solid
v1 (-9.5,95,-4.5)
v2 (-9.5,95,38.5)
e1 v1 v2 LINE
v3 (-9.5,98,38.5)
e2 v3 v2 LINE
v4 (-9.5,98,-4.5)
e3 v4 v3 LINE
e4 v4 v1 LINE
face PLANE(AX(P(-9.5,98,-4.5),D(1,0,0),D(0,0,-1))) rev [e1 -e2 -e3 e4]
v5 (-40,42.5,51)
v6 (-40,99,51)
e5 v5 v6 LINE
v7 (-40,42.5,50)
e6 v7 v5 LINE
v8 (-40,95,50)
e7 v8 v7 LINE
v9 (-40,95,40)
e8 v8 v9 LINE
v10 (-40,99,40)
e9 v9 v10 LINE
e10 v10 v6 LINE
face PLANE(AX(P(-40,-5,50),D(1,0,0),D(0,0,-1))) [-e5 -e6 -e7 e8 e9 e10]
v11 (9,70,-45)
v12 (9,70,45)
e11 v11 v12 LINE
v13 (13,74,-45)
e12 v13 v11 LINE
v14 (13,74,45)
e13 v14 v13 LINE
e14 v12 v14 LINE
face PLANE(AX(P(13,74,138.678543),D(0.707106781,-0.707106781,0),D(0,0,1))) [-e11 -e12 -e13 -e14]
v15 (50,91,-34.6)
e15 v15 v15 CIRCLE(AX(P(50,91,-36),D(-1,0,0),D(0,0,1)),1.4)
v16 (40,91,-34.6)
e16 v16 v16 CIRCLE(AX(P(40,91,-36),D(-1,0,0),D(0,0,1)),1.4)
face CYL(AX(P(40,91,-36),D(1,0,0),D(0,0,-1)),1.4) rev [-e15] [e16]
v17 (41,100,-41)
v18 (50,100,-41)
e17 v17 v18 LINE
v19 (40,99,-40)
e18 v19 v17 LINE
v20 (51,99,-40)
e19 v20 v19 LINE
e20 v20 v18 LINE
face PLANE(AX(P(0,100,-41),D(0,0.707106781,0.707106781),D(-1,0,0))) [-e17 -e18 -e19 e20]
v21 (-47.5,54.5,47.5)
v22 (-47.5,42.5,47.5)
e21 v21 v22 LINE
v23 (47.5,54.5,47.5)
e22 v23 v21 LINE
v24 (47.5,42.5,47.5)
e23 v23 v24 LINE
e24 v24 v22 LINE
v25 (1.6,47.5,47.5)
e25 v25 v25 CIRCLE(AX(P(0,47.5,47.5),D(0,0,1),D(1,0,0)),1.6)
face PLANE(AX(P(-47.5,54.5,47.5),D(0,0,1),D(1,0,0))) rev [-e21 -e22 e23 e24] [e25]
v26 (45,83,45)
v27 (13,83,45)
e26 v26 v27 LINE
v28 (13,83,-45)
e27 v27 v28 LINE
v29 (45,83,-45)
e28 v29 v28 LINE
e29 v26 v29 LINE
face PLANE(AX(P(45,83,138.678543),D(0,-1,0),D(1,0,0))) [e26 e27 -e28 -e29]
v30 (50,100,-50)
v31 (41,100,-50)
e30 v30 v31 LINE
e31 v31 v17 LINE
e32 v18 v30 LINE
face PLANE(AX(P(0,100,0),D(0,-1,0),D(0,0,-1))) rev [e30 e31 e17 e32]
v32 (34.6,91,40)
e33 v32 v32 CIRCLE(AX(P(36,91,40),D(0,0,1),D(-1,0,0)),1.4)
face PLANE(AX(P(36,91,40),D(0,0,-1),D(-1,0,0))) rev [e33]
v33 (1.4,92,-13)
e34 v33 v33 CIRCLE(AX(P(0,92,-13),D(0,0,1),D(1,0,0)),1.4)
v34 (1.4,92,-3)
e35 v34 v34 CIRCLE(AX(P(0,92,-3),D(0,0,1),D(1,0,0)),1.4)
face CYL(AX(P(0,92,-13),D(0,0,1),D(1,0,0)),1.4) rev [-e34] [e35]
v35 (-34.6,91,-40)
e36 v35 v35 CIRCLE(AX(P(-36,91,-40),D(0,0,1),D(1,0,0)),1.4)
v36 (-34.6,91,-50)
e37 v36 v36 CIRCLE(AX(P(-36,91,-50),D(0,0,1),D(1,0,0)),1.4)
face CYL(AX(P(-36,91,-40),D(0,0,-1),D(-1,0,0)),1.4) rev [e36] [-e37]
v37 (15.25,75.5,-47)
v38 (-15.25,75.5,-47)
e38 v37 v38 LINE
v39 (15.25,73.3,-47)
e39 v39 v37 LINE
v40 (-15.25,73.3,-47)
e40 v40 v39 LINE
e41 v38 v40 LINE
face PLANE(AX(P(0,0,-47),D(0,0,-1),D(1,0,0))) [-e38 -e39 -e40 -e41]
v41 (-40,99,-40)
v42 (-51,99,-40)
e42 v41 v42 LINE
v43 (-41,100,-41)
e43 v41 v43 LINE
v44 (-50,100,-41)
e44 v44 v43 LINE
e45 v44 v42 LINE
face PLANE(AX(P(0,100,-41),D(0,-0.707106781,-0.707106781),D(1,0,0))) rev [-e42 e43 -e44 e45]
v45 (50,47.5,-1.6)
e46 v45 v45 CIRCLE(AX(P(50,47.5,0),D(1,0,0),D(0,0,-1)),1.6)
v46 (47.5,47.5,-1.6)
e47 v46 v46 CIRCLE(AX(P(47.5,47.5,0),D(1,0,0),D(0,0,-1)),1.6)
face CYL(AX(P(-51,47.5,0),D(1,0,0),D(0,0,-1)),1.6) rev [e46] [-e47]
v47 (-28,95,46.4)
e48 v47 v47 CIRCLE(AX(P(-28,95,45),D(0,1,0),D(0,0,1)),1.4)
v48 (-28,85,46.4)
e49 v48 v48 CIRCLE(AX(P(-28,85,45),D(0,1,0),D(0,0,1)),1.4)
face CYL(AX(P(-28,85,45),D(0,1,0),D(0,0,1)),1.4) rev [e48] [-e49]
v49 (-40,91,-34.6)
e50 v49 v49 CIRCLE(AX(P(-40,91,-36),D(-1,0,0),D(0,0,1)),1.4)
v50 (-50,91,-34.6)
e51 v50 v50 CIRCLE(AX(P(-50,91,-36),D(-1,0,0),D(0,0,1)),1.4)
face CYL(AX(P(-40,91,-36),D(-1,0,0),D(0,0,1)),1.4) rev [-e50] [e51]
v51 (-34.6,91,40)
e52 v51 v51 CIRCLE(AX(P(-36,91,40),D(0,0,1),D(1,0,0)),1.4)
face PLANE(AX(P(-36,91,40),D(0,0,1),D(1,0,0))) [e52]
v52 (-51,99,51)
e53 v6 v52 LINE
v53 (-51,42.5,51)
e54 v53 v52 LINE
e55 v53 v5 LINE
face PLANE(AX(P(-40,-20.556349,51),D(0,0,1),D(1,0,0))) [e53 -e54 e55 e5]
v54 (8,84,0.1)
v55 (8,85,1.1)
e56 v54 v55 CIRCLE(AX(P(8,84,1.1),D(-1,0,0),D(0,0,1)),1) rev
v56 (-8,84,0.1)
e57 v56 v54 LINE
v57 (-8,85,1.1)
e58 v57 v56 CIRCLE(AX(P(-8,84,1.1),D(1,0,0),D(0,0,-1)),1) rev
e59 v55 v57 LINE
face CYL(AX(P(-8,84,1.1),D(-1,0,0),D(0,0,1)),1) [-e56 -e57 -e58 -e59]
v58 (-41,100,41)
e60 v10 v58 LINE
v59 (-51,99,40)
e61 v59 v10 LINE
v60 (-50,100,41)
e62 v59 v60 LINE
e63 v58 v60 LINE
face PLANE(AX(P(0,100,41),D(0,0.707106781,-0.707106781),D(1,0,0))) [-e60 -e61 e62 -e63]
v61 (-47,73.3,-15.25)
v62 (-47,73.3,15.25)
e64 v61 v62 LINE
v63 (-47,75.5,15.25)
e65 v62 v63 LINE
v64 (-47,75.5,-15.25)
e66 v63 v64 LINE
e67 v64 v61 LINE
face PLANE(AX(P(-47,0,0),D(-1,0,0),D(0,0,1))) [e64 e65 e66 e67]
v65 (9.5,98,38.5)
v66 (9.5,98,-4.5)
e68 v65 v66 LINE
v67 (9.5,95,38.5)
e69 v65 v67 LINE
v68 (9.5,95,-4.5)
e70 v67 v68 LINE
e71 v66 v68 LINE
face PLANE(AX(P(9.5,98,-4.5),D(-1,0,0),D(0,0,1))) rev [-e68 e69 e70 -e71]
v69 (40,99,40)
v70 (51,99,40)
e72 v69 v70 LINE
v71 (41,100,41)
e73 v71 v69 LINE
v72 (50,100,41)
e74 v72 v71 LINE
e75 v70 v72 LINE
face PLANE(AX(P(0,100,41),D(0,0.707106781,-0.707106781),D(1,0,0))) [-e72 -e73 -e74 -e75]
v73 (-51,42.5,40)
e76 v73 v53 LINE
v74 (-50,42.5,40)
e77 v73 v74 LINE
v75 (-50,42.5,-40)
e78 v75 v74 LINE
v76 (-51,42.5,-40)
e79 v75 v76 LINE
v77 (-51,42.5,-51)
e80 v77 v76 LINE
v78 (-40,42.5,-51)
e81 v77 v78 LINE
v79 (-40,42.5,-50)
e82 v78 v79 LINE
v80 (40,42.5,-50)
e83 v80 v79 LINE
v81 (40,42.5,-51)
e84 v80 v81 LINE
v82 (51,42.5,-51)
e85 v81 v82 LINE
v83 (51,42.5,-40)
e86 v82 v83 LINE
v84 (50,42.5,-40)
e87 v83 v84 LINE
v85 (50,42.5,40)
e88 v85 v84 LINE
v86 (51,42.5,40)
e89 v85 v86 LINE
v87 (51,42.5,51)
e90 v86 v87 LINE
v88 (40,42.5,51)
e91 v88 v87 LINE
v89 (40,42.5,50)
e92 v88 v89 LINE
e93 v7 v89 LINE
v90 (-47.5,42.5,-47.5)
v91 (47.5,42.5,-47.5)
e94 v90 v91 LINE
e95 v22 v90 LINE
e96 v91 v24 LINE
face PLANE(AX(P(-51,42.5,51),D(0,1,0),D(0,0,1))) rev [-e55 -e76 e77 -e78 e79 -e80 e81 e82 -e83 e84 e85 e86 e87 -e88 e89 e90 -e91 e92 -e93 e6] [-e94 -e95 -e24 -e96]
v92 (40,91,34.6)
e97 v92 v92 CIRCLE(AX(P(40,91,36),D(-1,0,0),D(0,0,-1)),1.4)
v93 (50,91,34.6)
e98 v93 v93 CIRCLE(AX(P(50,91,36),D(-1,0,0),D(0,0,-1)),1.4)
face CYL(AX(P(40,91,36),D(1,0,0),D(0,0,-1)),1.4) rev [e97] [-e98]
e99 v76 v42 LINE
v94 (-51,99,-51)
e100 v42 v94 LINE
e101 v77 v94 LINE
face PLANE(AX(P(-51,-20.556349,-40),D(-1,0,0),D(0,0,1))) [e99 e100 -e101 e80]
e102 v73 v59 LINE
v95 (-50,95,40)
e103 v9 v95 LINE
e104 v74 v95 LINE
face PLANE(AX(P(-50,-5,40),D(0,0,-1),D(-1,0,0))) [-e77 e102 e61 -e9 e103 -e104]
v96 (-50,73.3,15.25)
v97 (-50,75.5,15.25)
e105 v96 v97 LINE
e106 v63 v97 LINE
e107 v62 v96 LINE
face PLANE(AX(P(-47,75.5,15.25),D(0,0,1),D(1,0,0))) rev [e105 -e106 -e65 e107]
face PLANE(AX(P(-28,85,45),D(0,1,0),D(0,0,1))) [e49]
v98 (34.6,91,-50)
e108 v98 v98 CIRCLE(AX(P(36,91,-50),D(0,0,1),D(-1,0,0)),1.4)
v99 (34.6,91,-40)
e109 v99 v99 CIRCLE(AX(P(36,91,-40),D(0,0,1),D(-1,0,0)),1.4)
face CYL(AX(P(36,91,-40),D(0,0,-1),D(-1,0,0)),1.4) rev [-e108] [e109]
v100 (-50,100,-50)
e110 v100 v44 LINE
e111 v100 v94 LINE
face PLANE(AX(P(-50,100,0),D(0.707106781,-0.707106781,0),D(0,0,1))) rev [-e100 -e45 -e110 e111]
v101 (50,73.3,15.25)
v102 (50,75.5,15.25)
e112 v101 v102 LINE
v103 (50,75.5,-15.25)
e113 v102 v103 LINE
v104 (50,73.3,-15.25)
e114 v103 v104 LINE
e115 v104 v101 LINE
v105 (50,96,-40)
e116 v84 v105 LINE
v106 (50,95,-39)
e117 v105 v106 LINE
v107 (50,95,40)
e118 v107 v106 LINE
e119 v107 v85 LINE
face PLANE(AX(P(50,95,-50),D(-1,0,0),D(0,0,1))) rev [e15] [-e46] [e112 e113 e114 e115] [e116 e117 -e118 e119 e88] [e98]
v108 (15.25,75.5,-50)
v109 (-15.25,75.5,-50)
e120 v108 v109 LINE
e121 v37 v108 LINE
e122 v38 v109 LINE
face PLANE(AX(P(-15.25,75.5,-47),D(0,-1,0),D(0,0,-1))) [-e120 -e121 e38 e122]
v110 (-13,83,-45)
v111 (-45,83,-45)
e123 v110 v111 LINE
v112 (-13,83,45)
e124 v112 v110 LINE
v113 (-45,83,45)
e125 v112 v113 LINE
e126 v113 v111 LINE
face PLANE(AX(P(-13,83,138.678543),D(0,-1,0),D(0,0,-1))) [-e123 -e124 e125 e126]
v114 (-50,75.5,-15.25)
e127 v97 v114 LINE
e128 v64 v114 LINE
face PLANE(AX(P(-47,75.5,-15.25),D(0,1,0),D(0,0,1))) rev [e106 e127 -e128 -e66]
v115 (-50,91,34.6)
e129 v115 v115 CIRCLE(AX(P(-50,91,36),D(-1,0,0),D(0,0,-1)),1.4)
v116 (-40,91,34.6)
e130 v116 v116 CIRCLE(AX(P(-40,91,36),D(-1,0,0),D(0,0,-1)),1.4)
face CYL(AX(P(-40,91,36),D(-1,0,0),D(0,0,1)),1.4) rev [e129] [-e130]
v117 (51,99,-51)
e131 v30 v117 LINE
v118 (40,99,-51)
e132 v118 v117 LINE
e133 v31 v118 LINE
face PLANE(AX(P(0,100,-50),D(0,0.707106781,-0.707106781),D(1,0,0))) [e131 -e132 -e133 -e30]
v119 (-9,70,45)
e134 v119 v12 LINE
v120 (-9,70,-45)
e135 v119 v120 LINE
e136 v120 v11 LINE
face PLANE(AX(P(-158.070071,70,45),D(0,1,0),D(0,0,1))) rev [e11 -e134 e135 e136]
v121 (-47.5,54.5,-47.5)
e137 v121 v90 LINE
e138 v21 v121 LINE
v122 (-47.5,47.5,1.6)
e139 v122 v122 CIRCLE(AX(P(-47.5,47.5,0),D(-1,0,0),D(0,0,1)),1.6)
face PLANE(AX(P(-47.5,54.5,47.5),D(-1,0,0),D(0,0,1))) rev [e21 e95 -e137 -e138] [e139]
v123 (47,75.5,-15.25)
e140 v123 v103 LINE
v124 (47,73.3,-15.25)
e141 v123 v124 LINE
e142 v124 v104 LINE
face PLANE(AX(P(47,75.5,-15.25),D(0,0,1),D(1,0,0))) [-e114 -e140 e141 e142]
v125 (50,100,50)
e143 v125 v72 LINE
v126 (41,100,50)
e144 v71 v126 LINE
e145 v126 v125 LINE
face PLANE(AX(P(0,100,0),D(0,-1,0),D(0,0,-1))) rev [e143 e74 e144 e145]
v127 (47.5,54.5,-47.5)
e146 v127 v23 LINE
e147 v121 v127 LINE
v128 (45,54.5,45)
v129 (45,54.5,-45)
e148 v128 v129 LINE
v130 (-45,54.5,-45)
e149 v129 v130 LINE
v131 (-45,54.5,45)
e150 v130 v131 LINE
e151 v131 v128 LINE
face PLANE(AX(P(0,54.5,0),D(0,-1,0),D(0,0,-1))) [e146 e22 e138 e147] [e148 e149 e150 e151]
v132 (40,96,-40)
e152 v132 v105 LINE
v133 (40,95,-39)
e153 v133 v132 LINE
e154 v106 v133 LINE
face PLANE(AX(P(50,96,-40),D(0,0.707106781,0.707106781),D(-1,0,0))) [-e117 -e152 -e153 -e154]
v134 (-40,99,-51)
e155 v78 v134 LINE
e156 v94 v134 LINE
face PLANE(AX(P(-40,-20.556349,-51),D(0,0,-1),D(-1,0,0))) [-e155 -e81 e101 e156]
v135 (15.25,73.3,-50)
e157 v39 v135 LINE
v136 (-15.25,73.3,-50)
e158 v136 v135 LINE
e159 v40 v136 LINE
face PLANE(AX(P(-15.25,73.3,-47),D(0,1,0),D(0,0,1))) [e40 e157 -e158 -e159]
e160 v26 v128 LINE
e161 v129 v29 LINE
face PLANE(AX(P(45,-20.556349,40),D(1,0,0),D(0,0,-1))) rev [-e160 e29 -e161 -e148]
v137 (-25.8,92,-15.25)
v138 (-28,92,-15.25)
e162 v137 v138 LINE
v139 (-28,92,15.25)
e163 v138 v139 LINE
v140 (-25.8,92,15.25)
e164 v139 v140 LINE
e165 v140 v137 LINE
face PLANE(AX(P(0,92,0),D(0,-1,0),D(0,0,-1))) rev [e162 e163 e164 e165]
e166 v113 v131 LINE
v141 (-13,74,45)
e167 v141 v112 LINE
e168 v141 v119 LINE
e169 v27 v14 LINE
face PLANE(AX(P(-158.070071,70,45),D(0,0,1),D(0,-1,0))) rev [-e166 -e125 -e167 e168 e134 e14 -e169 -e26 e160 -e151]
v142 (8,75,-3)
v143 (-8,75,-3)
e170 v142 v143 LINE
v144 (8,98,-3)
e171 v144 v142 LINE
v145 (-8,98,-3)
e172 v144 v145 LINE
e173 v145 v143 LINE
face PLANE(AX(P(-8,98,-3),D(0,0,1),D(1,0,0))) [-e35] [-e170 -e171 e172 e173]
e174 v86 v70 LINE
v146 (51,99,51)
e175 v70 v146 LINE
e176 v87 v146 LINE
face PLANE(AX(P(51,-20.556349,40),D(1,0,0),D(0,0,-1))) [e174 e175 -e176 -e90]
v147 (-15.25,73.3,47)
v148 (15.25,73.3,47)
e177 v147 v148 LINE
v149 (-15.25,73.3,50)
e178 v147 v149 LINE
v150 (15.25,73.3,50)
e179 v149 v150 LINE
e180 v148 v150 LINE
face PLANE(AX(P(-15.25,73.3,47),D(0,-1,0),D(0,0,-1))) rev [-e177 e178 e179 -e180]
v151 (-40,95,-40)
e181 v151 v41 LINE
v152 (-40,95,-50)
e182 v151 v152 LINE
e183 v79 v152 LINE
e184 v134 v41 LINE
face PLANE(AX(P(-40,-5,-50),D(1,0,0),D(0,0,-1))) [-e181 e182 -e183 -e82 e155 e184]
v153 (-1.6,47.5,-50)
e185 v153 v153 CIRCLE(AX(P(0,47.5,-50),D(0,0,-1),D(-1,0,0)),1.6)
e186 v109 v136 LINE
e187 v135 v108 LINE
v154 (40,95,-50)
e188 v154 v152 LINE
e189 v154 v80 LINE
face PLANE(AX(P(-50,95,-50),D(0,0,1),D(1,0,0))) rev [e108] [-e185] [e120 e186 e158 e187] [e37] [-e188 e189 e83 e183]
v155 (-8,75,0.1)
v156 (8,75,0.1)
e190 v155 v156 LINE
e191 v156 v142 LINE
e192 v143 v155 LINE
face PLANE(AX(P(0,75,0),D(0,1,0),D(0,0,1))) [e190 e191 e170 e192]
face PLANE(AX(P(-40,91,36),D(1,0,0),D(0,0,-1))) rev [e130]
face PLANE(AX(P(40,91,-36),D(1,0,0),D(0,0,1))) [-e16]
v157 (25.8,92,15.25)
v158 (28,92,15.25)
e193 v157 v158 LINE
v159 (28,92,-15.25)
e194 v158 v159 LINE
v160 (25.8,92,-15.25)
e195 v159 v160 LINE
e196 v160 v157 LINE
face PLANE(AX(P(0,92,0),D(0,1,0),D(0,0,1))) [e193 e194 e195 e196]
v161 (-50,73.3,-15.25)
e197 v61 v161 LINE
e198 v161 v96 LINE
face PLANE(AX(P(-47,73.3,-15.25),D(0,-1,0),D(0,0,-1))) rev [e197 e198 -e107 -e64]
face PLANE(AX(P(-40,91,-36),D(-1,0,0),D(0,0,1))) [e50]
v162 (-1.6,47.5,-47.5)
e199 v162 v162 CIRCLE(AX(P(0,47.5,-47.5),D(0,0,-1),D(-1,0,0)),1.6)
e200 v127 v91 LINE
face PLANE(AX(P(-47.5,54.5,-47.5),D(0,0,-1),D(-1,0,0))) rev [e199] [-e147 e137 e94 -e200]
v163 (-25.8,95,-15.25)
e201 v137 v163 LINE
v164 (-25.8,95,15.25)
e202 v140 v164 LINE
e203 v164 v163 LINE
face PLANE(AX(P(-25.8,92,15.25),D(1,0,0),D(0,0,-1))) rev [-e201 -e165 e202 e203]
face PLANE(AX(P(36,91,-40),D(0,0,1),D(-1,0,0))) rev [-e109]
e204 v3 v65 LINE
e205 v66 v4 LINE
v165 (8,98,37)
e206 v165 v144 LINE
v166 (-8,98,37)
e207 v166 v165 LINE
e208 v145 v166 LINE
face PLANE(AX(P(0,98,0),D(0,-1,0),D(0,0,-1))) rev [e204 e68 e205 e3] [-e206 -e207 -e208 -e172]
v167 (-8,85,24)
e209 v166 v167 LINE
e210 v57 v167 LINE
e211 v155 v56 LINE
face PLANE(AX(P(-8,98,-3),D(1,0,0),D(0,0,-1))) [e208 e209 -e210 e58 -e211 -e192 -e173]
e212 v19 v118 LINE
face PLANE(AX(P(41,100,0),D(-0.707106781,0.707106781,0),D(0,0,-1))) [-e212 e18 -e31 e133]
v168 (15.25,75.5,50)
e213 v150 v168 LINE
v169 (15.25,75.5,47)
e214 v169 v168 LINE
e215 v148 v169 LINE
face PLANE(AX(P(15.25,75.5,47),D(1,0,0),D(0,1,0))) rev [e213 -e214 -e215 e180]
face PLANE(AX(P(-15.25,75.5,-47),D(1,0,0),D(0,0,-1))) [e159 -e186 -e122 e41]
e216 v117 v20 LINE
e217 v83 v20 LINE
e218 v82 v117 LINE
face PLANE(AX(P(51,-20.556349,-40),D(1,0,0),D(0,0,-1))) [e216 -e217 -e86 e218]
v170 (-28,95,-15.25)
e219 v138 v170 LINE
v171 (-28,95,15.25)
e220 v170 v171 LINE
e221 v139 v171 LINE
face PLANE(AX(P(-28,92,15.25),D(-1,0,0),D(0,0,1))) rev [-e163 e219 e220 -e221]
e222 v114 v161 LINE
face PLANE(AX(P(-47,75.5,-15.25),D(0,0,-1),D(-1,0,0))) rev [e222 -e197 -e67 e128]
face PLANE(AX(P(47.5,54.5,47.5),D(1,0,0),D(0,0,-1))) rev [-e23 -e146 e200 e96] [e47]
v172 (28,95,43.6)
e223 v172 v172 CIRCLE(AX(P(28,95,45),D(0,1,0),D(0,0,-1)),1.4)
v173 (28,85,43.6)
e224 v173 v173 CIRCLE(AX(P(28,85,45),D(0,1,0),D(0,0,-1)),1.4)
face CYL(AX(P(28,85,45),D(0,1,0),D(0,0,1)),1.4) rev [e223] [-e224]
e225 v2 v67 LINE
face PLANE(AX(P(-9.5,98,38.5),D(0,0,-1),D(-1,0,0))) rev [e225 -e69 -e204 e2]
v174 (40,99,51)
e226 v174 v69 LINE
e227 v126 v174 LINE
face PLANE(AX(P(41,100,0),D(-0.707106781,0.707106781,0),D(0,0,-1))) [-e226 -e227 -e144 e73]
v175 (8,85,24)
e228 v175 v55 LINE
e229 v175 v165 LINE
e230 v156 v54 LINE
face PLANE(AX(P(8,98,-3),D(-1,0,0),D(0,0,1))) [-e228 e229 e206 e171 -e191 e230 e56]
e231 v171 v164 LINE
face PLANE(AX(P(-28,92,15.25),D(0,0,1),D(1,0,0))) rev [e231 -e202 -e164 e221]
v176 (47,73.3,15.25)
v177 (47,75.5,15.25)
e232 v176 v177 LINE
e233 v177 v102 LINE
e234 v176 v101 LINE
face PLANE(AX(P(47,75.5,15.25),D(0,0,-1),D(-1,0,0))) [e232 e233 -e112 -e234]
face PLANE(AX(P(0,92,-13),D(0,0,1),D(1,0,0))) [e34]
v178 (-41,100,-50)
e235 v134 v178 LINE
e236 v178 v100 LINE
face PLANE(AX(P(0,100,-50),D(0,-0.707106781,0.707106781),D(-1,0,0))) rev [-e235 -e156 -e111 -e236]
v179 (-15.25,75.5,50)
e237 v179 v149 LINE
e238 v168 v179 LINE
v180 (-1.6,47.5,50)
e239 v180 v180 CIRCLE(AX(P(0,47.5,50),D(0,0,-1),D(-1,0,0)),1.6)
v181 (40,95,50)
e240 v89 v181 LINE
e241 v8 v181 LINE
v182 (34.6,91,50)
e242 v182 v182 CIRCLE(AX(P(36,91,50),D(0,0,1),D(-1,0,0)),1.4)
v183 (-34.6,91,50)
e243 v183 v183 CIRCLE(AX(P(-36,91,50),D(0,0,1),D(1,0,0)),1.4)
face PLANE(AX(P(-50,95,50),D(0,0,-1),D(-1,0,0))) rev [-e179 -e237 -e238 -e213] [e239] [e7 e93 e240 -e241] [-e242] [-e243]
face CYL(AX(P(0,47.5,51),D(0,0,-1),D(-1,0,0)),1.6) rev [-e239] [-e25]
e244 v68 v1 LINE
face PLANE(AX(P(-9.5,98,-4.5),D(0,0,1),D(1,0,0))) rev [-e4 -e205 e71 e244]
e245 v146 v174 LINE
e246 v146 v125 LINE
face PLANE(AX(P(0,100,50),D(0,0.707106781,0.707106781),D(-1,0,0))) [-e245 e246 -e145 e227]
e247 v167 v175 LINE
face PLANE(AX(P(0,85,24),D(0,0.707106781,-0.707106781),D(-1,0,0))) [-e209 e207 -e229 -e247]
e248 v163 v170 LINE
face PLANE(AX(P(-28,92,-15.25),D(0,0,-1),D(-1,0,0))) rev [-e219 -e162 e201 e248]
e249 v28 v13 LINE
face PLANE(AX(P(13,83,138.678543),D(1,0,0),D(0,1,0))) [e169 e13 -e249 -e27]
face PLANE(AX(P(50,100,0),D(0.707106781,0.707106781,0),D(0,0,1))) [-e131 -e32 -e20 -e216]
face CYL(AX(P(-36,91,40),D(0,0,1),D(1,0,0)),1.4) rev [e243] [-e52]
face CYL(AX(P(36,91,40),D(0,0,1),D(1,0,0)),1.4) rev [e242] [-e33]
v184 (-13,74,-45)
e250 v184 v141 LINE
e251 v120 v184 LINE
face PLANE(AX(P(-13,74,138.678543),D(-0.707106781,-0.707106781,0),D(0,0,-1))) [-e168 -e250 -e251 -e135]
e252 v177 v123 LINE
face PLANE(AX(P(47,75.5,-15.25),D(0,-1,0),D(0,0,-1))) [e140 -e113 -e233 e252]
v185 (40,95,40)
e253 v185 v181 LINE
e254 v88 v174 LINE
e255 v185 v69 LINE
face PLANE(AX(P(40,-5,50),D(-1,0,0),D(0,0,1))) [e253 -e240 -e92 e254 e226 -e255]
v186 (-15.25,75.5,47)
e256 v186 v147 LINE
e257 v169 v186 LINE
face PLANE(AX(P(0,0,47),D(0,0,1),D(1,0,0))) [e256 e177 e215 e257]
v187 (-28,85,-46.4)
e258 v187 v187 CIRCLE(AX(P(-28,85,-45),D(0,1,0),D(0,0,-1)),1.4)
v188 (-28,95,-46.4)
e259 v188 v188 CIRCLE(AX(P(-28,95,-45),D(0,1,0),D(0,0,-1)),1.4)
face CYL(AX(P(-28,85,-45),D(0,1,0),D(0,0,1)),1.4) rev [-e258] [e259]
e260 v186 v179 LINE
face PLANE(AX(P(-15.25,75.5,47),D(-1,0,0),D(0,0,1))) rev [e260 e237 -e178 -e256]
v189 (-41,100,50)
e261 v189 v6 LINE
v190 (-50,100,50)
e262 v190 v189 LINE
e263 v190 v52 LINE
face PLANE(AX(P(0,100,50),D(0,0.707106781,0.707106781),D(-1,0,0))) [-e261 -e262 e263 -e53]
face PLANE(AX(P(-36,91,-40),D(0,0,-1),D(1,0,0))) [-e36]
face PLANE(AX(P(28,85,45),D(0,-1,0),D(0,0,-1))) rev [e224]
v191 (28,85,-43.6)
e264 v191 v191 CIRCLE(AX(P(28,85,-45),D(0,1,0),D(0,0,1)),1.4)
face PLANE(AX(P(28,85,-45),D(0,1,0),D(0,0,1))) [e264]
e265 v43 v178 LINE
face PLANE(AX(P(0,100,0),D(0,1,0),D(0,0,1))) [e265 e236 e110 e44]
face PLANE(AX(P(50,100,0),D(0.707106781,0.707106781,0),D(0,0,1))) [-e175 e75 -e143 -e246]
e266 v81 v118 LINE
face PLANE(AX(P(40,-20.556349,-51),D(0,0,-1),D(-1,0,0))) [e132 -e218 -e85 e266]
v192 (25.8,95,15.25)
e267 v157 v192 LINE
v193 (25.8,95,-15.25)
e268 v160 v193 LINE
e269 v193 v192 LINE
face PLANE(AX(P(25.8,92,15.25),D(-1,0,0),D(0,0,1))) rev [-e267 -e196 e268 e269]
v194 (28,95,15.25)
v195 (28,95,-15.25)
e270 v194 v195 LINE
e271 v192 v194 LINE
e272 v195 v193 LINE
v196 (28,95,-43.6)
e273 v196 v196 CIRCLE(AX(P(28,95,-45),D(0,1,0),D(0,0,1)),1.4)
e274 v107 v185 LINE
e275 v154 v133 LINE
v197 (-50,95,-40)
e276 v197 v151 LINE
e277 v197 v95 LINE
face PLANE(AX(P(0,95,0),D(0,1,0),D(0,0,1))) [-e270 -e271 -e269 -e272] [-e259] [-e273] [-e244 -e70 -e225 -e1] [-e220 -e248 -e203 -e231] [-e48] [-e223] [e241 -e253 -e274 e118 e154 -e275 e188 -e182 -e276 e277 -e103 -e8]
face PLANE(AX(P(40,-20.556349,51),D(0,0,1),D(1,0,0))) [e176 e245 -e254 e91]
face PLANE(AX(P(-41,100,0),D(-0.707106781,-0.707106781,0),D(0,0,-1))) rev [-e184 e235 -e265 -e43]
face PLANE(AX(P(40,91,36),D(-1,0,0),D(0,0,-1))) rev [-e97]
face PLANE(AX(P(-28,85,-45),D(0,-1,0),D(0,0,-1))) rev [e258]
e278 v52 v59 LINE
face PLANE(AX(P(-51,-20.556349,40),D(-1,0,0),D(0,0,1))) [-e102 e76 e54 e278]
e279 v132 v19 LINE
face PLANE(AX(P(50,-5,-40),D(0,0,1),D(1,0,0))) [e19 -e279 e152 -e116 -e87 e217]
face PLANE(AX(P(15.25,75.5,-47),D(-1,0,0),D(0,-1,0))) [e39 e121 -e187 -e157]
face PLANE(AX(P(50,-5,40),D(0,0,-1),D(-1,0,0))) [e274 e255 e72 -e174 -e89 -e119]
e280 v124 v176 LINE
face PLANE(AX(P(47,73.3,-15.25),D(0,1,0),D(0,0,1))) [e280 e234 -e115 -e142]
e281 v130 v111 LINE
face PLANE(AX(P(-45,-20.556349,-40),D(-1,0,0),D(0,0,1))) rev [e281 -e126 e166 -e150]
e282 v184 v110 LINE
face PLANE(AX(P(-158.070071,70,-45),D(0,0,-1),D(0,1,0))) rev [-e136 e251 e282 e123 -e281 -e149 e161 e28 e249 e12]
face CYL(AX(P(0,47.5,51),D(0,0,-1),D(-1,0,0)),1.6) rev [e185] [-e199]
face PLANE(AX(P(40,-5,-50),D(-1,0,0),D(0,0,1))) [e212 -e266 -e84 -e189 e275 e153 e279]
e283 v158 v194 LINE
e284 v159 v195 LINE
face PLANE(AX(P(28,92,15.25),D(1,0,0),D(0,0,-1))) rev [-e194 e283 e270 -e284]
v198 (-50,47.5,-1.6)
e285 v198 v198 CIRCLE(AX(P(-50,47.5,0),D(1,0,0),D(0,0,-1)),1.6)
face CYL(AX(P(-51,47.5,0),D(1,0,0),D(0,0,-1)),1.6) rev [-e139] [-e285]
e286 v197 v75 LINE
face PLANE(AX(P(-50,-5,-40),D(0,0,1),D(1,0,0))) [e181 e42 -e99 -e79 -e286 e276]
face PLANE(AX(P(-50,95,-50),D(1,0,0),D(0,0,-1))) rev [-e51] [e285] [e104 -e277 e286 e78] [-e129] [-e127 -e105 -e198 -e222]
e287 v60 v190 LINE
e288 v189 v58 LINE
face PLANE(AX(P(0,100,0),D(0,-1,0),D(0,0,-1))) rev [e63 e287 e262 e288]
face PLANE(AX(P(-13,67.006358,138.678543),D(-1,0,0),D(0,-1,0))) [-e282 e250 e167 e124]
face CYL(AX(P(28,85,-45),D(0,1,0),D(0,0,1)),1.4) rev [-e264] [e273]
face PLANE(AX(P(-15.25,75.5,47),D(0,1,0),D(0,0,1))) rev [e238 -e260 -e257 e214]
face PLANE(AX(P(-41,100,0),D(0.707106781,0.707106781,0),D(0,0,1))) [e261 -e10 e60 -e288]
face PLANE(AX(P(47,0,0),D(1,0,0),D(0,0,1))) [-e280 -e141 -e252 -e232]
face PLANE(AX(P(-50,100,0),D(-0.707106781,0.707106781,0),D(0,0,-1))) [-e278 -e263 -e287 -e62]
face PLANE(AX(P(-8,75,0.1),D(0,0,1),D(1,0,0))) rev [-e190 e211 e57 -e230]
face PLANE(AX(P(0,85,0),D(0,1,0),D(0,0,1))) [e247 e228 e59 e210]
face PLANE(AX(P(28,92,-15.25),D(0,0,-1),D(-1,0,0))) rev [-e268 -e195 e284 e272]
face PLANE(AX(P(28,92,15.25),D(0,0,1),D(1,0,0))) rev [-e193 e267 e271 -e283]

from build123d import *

# Parameters (mm, degrees)
SKETCH1_W                       = 100
SKETCH1_H                       = 100
BOSS_EXTRUDE1_DEPTH             = 95
SKETCH2_W                       = 10
SKETCH2_H                       = 10
BOSS_EXTRUDE2_DEPTH             = 105
SKETCH3_R                       = 1.4
CUT_EXTRUDE1_DEPTH              = 10
SKETCH4_W                       = 11
SKETCH4_H                       = 11
BOSS_EXTRUDE3_DEPTH             = 105
SKETCH5_R                       = 1.4
CUT_EXTRUDE2_DEPTH              = 10
SKETCH6_R                       = 1.4
CUT_EXTRUDE3_DEPTH              = 10
CHAMFER1_SIZE                   = 1
SKETCH7_W                       = 19
SKETCH7_H                       = 43
SKETCH7_W_2                     = 16
SKETCH7_H_2                     = 40
BOSS_EXTRUDE4_DEPTH             = 3
SKETCH8_W                       = 16
SKETCH8_H                       = 40
CUT_EXTRUDE4_DEPTH              = 10
CHAMFER2_SIZE                   = 13
SKETCH9_W                       = 16
SKETCH9_H                       = 3.1
CUT_EXTRUDE5_DEPTH              = 10
FILLET1_R                       = 1
SKETCH10_R                      = 1.4
CUT_EXTRUDE6_DEPTH              = 10
SKETCH11_R                      = 5
BOSS_EXTRUDE5_DEPTH             = 3
SKETCH12_W                      = 30.5
SKETCH12_H                      = 2.2
CUT_EXTRUDE7_DEPTH              = 3
SKETCH13_W                      = 30.5
SKETCH13_H                      = 2.2
CUT_EXTRUDE8_DEPTH              = 3
SKETCH14_W                      = 2.2
SKETCH14_H                      = 30.5
CUT_EXTRUDE9_DEPTH              = 3
CUT_EXTRUDE10_DEPTH             = 45
CUT_EXTRUDE10_DEPTH_BACK        = 45
SKETCH15_W                      = 90
SKETCH15_H                      = 58
CUT_EXTRUDE11_REACH             = 125.296
CUT_EXTRUDE11_DIRECTION_2_REACH = 125.296
CHAMFER3_SIZE                   = 4
SKETCH17_W                      = 102
SKETCH17_H                      = 53.035118915
CUT_EXTRUDE12_DEPTH             = 152.673992497
SKETCH19_W                      = 95
SKETCH19_H                      = 95
CUT_EXTRUDE14_DEPTH             = 12
SKETCH20_R                      = 1.6
CUT_EXTRUDE15_DEPTH             = 152.003311222
SKETCH21_R                      = 1.6
CUT_EXTRUDE16_DEPTH             = 152.003311222


with BuildPart() as part:
    # Sketch1 → Boss-Extrude1 (new body)
    with BuildSketch(Plane(origin=(0, 0, 0), x_dir=(1, 0, 0), z_dir=(0, 1, 0))):
        Rectangle(SKETCH1_W, SKETCH1_H)
    extrude(amount=BOSS_EXTRUDE1_DEPTH)

    # Sketch2 → Boss-Extrude2 (add)
    with BuildSketch(Plane(origin=(0, 100, 0), x_dir=(1, 0, 0), z_dir=(0, 1, 0))):
        with Locations((-45, 45)):
            Rectangle(SKETCH2_W, SKETCH2_H)
        with Locations((45, 45)):
            Rectangle(SKETCH2_W, SKETCH2_H)
        with Locations((45, -45)):
            Rectangle(SKETCH2_W, SKETCH2_H)
        with Locations((-45, -45)):
            Rectangle(SKETCH2_W, SKETCH2_H)
    extrude(amount=-BOSS_EXTRUDE2_DEPTH)

    # Sketch3 → Cut-Extrude1 (cut)
    with BuildSketch(Plane(origin=(0, 95, 0), x_dir=(1, 0, 0), z_dir=(0, 1, 0))):
        with Locations(Location((-28, -45, 0), (0, 0, 270))):
            Circle(SKETCH3_R)
        with Locations(Location((28, -45, 0), (0, 0, 90))):
            Circle(SKETCH3_R)
        with Locations(Location((28, 45, 0), (0, 0, 270))):
            Circle(SKETCH3_R)
        with Locations(Location((-28, 45, 0), (0, 0, 90))):
            Circle(SKETCH3_R)
    cut_extrude1 = extrude(amount=-CUT_EXTRUDE1_DEPTH, mode=Mode.SUBTRACT)

    # Sketch4 → Boss-Extrude3 (add)
    with BuildSketch(Plane(origin=(0, 100, 0), x_dir=(1, 0, 0), z_dir=(0, 1, 0))):
        with Locations((-45.5, 45.5)):
            Rectangle(SKETCH4_W, SKETCH4_H)
        with Locations((45.5, 45.5)):
            Rectangle(SKETCH4_W, SKETCH4_H)
        with Locations((45.5, -45.5)):
            Rectangle(SKETCH4_W, SKETCH4_H)
        with Locations((-45.5, -45.5)):
            Rectangle(SKETCH4_W, SKETCH4_H)
    extrude(amount=-BOSS_EXTRUDE3_DEPTH)

    # Sketch5 → Cut-Extrude2 (cut)
    with BuildSketch(Plane.XY.offset(50)):
        with Locations((-36, 91)):
            Circle(SKETCH5_R)
        with Locations(Location((36, 91, 0), (0, 0, 180))):
            Circle(SKETCH5_R)
        with Locations((36, 4)):
            Circle(SKETCH5_R)
        with Locations(Location((-36, 4, 0), (0, 0, 180))):
            Circle(SKETCH5_R)
    cut_extrude2 = extrude(amount=-CUT_EXTRUDE2_DEPTH, mode=Mode.SUBTRACT)

    # Mirror1: Cut-Extrude2 across plane
    add(cut_extrude2.mirror(Plane.XY), mode=Mode.SUBTRACT)

    # Sketch6 → Cut-Extrude3 (cut)
    with BuildSketch(Plane.ZY.offset(50)):
        with Locations((-36, 91)):
            Circle(SKETCH6_R)
        with Locations(Location((36, 91, 0), (0, 0, 180))):
            Circle(SKETCH6_R)
        with Locations((36, 4)):
            Circle(SKETCH6_R)
        with Locations(Location((-36, 4, 0), (0, 0, 180))):
            Circle(SKETCH6_R)
    cut_extrude3 = extrude(amount=-CUT_EXTRUDE3_DEPTH, mode=Mode.SUBTRACT)

    # Mirror2: Cut-Extrude3 across plane
    add(cut_extrude3.mirror(Plane(origin=(0, 0, 0), x_dir=(0, 0, 1), z_dir=(1, 0, 0))), mode=Mode.SUBTRACT)

    # Mirror3: Cut-Extrude1 across plane
    add(cut_extrude1.mirror(Plane.ZX.offset(47.5)), mode=Mode.SUBTRACT)

    # Chamfer1
    chamfer1_edges = [part.edges().sort_by_distance(p)[0] for p in [
        (-45.5, -5, 51),
        (-51, -5, 45.5),
        (-51, 100, 45.5),
        (-45.5, 100, 51),
        (51, -5, 45.5),
        (45.5, -5, 51),
        (45.5, 100, 51),
        (51, 100, 45.5),
        (45.5, -5, -51),
        (51, -5, -45.5),
        (51, 100, -45.5),
        (45.5, 100, -51),
        (-51, -5, -45.5),
        (-45.5, -5, -51),
        (-45.5, 100, -51),
        (-51, 100, -45.5),
        (-45.5, -5, 40),
        (-40, -5, 45.5),
        (-40, 100, 45.5),
        (-45.5, 100, 40),
        (40, -5, 45.5),
        (45.5, -5, 40),
        (45.5, 100, 40),
        (40, 100, 45.5),
        (45.5, -5, -40),
        (40, -5, -45.5),
        (45, 95, -40),
        (40, 100, -45.5),
        (45.5, 100, -40),
        (-40, -5, -45.5),
        (-45.5, -5, -40),
        (-45.5, 100, -40),
        (-40, 100, -45.5),
    ]]
    chamfer(chamfer1_edges, length=CHAMFER1_SIZE)

    # Sketch7 → Boss-Extrude4 (add)
    with BuildSketch(Plane(origin=(0, 95, 0), x_dir=(1, 0, 0), z_dir=(0, 1, 0))):
        with Locations((0, -17)):
            Rectangle(SKETCH7_W, SKETCH7_H)
        with Locations((0, -17)):
            Rectangle(SKETCH7_W_2, SKETCH7_H_2, mode=Mode.SUBTRACT)
    extrude(amount=BOSS_EXTRUDE4_DEPTH)

    # Sketch8 → Cut-Extrude4 (cut)
    with BuildSketch(Plane(origin=(0, 95, 0), x_dir=(1, 0, 0), z_dir=(0, 1, 0))):
        with Locations((0, -17)):
            Rectangle(SKETCH8_W, SKETCH8_H)
    extrude(amount=-CUT_EXTRUDE4_DEPTH, mode=Mode.SUBTRACT)

    # Chamfer2
    chamfer2_edges = [part.edges().sort_by_distance(p)[0] for p in [
        (0, 85, 37),
    ]]
    chamfer(chamfer2_edges, length=CHAMFER2_SIZE - 0.0001)  # a hair under: the kernel refuses the full size

    # Sketch9 → Cut-Extrude5 (cut)
    with BuildSketch(Plane(origin=(0, 85, 0), x_dir=(1, 0, 0), z_dir=(0, 1, 0))):
        with Locations((0, 1.45)):
            Rectangle(SKETCH9_W, SKETCH9_H)
    extrude(amount=-CUT_EXTRUDE5_DEPTH, mode=Mode.SUBTRACT)

    # Fillet1
    fillet1_edges = [part.edges().sort_by_distance(p)[0] for p in [
        (0, 85, 0.1),
    ]]
    fillet(fillet1_edges, radius=FILLET1_R)

    # Sketch10 → Cut-Extrude6 (cut)
    with BuildSketch(Plane.XY.offset(-3)):
        with Locations((0, 92)):
            Circle(SKETCH10_R)
    extrude(amount=-CUT_EXTRUDE6_DEPTH, mode=Mode.SUBTRACT)

    # Sketch11 → Boss-Extrude5 (add)
    with BuildSketch(Plane.XZ):
        with Locations(Location((0, -15, 0), (0, 0, 90))):
            Circle(SKETCH11_R)
    extrude(amount=BOSS_EXTRUDE5_DEPTH)

    # Sketch12 → Cut-Extrude7 (cut)
    with BuildSketch(Plane.ZY.offset(50)):
        with Locations((0, 74.4)):
            Rectangle(SKETCH12_W, SKETCH12_H)
        with Locations((0, 20.6)):
            Rectangle(SKETCH12_W, SKETCH12_H)
    cut_extrude7 = extrude(amount=-CUT_EXTRUDE7_DEPTH, mode=Mode.SUBTRACT)

    # Mirror4: Cut-Extrude7 across plane
    add(cut_extrude7.mirror(Plane(origin=(0, 0, 0), x_dir=(0, 0, 1), z_dir=(1, 0, 0))), mode=Mode.SUBTRACT)

    # Sketch13 → Cut-Extrude8 (cut)
    with BuildSketch(Plane.XY.offset(50)):
        with Locations((0, 74.4)):
            Rectangle(SKETCH13_W, SKETCH13_H)
        with Locations((0, 20.6)):
            Rectangle(SKETCH13_W, SKETCH13_H)
    cut_extrude8 = extrude(amount=-CUT_EXTRUDE8_DEPTH, mode=Mode.SUBTRACT)

    # Mirror5: Cut-Extrude8 across plane
    add(cut_extrude8.mirror(Plane.XY), mode=Mode.SUBTRACT)

    # Sketch14 → Cut-Extrude9 (cut)
    with BuildSketch(Plane(origin=(0, 95, 0), x_dir=(1, 0, 0), z_dir=(0, 1, 0))):
        with Locations((26.9, 0)):
            Rectangle(SKETCH14_W, SKETCH14_H)
        with Locations((-26.9, 0)):
            Rectangle(SKETCH14_W, SKETCH14_H)
    cut_extrude9 = extrude(amount=-CUT_EXTRUDE9_DEPTH, mode=Mode.SUBTRACT)

    # Mirror6: Cut-Extrude9 across plane
    add(cut_extrude9.mirror(Plane.ZX.offset(47.5)), mode=Mode.SUBTRACT)

    # Sketch15 → Cut-Extrude10 (cut, two sides: drawn at the far end of the back side and taken through both)
    with BuildSketch(Plane(origin=(0, 0, 0), x_dir=(0, 0, -1), z_dir=(1, 0, 0)).offset(-CUT_EXTRUDE10_DEPTH_BACK)):
        with Locations((0, 41)):
            Rectangle(SKETCH15_W, SKETCH15_H)
    extrude(amount=CUT_EXTRUDE10_DEPTH + CUT_EXTRUDE10_DEPTH_BACK, mode=Mode.SUBTRACT)

    # Cut-Extrude11: up to this face of the body (flat: up to its plane)
    cut_extrude11_end = Plane(part.part.faces().sort_by_distance((0, 41, 45))[0])
    # Sketch16 → Cut-Extrude11 (cut, up to the picked face)
    with BuildSketch(Plane.XY, mode=Mode.PRIVATE) as cut_extrude11_sk1:
        Polygon((45, 57.006357685), (-45, 57.006357685), (-45, 83), (-13, 83), (-13, 67.006357685), (13, 67.006357685), (13, 83), (45, 83), align=None)
    cut_extrude11_tool1 = split(extrude(cut_extrude11_sk1.sketch, amount=CUT_EXTRUDE11_REACH, mode=Mode.PRIVATE), bisect_by=cut_extrude11_end, keep=Keep.BOTH, mode=Mode.PRIVATE)
    add(cut_extrude11_tool1.solids().sort_by(Axis((0, 57.943143, 0), (0, 0, 1)))[0], mode=Mode.SUBTRACT)

    # Cut-Extrude11 direction 2: up to this face of the body (flat: up to its plane)
    cut_extrude11_direction_2_end = Plane(part.part.faces().sort_by_distance((0, 41, -45))[0])
    # Sketch16 → Cut-Extrude11 direction 2 (cut, up to the picked face)
    with BuildSketch(Plane.XY, mode=Mode.PRIVATE) as cut_extrude11_direction_2_sk1:
        Polygon((45, 57.006357685), (-45, 57.006357685), (-45, 83), (-13, 83), (-13, 67.006357685), (13, 67.006357685), (13, 83), (45, 83), align=None)
    cut_extrude11_direction_2_tool1 = split(extrude(cut_extrude11_direction_2_sk1.sketch, amount=-CUT_EXTRUDE11_DIRECTION_2_REACH, mode=Mode.PRIVATE), bisect_by=cut_extrude11_direction_2_end, keep=Keep.BOTH, mode=Mode.PRIVATE)
    add(cut_extrude11_direction_2_tool1.solids().sort_by(Axis((0, 57.943143, 0), (0, 0, -1)))[0], mode=Mode.SUBTRACT)

    # Chamfer3
    chamfer3_edges = [part.edges().sort_by_distance(p)[0] for p in [
        (13, 70, 0),
        (-13, 70, 0),
    ]]
    chamfer(chamfer3_edges, length=CHAMFER3_SIZE)

    # Sketch17 → Cut-Extrude12 (cut, through all)
    with BuildSketch(Plane(origin=(51, 0, 0), x_dir=(0, 0, -1), z_dir=(1, 0, 0))):
        with Locations((0, 15.982440543)):
            Rectangle(SKETCH17_W, SKETCH17_H)
    extrude(amount=-CUT_EXTRUDE12_DEPTH, mode=Mode.SUBTRACT)

    # Sketch19 → Cut-Extrude14 (cut)
    with BuildSketch(Plane.XZ.offset(-42.5)):
        Rectangle(SKETCH19_W, SKETCH19_H)
    extrude(amount=-CUT_EXTRUDE14_DEPTH, mode=Mode.SUBTRACT)

    # Sketch20 → Cut-Extrude15 (cut, through all)
    with BuildSketch(Plane(origin=(50, 0, 0), x_dir=(0, 0, -1), z_dir=(1, 0, 0))):
        with Locations((0, 47.5)):
            Circle(SKETCH20_R)
    extrude(amount=-CUT_EXTRUDE15_DEPTH, mode=Mode.SUBTRACT)

    # Sketch21 → Cut-Extrude16 (cut, through all)
    with BuildSketch(Plane(origin=(0, 0, -50), x_dir=(-1, 0, 0), z_dir=(0, 0, -1))):
        with Locations((0, 47.5)):
            Circle(SKETCH21_R)
    extrude(amount=-CUT_EXTRUDE16_DEPTH, mode=Mode.SUBTRACT)


solid = part.part
